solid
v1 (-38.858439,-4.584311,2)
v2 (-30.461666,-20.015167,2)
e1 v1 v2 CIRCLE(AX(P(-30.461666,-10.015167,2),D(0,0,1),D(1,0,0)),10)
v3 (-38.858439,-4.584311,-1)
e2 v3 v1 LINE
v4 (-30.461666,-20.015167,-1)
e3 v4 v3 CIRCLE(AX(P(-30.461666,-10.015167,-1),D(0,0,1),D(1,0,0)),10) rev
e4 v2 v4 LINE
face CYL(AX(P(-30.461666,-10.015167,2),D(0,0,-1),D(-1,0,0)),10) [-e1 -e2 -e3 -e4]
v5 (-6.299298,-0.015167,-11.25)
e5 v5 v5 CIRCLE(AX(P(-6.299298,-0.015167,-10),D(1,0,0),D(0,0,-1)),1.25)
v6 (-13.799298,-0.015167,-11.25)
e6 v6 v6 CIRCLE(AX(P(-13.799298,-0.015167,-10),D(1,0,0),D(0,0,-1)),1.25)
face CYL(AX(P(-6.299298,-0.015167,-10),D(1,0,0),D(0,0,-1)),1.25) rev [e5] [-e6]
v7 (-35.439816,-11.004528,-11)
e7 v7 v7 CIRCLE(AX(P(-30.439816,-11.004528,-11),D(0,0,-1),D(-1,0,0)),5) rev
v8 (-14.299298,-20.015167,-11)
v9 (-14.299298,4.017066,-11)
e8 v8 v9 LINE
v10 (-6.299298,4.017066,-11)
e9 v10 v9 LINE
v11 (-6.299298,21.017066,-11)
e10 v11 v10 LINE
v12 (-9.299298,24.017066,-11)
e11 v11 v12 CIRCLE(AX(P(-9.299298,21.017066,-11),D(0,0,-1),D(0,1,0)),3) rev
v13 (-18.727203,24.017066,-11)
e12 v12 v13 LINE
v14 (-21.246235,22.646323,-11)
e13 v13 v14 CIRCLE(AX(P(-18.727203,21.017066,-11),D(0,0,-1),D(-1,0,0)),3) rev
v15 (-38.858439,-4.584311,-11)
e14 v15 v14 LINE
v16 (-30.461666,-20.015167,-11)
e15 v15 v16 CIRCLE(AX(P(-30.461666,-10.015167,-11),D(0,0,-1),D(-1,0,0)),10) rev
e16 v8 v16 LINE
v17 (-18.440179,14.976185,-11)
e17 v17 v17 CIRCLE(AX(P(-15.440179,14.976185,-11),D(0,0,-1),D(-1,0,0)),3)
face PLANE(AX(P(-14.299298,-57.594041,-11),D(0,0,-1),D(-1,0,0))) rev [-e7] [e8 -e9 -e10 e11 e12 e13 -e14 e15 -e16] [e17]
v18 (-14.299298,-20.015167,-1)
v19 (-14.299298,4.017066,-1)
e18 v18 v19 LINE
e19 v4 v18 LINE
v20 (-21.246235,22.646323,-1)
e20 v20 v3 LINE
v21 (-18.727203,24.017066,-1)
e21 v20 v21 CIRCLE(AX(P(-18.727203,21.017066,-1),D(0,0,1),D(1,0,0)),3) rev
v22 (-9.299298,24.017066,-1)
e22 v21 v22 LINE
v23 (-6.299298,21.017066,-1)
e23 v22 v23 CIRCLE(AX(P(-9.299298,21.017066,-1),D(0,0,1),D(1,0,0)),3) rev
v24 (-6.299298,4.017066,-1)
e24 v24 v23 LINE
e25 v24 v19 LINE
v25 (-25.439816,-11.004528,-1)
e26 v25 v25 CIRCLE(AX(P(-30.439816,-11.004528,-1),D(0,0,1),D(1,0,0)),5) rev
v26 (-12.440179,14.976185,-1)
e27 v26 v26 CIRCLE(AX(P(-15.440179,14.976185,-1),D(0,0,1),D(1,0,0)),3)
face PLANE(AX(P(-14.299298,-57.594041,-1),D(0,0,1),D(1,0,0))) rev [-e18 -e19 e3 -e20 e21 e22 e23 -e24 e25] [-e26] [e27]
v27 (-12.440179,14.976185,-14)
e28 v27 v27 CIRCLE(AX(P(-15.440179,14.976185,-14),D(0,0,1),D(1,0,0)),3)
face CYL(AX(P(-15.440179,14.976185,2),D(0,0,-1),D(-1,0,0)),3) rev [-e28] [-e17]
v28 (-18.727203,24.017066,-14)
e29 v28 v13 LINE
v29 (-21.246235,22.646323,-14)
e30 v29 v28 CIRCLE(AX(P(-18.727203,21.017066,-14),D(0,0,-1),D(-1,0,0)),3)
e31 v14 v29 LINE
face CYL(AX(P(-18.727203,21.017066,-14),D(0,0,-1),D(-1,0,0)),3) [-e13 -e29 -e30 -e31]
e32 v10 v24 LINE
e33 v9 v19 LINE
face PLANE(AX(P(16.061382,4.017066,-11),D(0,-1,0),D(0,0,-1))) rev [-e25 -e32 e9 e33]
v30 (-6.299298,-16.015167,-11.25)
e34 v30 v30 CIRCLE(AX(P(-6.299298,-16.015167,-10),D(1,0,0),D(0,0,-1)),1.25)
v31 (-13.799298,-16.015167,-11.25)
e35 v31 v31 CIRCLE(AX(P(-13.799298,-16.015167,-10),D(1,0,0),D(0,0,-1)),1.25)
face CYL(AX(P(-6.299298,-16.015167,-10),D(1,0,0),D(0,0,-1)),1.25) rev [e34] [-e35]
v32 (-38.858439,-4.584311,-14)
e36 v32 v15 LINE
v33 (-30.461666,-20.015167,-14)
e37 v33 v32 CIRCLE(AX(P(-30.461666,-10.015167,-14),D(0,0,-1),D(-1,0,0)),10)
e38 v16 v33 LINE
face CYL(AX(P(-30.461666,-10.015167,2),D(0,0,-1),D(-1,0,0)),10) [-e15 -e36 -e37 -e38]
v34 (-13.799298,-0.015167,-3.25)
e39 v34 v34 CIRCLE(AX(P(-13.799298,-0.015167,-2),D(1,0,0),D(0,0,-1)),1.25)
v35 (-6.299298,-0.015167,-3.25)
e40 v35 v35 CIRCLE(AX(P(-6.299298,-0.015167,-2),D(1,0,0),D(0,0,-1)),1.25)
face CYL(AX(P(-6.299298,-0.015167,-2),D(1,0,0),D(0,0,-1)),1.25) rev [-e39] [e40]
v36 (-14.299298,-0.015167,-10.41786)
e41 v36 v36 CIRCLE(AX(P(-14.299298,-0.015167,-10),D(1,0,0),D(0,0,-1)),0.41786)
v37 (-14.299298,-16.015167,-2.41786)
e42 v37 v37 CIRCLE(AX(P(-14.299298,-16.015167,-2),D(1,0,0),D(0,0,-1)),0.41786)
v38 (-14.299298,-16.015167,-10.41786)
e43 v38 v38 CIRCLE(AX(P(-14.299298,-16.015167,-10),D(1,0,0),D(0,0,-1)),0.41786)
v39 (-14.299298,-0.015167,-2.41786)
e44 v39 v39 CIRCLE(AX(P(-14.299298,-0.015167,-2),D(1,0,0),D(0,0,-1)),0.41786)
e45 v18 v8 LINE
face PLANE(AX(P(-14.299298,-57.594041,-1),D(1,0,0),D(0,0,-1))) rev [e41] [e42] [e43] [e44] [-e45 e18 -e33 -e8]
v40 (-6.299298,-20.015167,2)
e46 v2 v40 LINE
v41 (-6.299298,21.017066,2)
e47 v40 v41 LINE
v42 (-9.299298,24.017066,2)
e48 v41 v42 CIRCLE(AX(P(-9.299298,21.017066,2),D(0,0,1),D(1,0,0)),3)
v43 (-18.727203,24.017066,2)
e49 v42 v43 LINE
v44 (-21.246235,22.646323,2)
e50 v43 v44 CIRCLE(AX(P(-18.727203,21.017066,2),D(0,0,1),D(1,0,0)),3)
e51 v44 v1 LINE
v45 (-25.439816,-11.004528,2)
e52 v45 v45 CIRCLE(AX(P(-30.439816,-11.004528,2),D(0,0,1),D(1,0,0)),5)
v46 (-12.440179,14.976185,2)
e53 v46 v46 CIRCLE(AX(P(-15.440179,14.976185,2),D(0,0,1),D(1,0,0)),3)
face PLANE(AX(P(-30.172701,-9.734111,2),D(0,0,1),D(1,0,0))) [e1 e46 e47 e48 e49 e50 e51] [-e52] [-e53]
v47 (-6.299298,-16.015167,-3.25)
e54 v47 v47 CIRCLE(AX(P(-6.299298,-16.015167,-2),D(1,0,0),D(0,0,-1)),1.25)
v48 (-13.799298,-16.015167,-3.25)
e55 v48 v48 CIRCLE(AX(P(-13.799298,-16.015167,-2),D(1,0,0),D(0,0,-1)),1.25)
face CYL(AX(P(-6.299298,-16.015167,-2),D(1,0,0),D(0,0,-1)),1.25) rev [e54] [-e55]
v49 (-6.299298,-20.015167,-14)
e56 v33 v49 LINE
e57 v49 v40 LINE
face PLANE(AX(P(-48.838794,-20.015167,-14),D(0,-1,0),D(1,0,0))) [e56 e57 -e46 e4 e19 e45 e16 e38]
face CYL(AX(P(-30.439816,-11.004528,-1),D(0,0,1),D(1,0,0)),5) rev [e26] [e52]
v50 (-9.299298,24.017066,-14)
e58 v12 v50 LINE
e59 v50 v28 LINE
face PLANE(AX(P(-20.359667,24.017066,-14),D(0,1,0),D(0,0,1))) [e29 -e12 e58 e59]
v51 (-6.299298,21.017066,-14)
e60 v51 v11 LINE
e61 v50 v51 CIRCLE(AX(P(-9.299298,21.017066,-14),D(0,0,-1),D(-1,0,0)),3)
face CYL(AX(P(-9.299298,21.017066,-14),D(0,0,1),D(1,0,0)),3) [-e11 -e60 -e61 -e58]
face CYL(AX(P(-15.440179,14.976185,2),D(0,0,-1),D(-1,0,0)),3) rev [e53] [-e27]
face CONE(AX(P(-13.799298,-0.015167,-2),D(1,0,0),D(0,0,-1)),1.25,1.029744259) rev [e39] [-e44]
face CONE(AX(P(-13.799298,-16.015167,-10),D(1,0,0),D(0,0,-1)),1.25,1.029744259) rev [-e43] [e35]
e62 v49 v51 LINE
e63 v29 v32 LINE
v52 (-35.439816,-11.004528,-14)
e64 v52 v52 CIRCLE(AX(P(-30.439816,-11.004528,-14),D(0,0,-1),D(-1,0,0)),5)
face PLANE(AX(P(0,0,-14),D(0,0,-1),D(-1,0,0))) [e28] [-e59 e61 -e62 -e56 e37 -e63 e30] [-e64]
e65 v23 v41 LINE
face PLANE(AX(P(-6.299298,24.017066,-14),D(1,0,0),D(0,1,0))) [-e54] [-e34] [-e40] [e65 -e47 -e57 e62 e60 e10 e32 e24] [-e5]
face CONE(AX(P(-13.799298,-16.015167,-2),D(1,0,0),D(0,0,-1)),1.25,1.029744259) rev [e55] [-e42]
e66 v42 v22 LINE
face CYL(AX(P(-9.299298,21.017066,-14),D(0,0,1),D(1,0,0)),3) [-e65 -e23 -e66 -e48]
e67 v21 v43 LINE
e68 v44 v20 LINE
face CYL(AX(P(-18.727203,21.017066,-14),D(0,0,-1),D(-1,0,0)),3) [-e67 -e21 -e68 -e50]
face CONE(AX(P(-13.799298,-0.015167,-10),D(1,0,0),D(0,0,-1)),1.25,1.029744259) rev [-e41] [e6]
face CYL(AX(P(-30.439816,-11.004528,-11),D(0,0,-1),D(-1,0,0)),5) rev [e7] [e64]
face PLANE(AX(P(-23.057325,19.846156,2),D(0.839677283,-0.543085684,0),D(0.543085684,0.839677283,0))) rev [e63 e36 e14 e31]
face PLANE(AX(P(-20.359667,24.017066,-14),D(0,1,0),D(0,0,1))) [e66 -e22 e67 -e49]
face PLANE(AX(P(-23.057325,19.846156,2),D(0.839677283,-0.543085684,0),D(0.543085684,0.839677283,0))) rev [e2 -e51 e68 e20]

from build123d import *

# Parameters (mm, degrees)
SKETCH_1_R             = 3
EXTRUDE_1_DEPTH        = 2
SKETCH_2_W             = 53.96
SKETCH_2_H             = 15
SKETCH_2_R             = 1.6
SKETCH_2_R_2           = 1
EXTRUDE_2_DEPTH        = 2
PATTERN_LINEAR_1_COUNT = 2
PATTERN_LINEAR_1_PITCH = 13
FILLET_1_R             = 1
EXTRUDE_START          = -16
SKETCH_4_R             = 3
EXTRUDE_3_DEPTH        = 16
SKETCH_5_W             = 71.597299473
SKETCH_5_H             = 10
CUT_EXTRUDE_1_DEPTH    = 15
SKETCH_6_R             = 5
CUT_EXTRUDE_2_DEPTH    = 3
CUT_EXTRUDE_START      = -3
SKETCH_7_R             = 5
CUT_EXTRUDE_3_DEPTH    = 3
FILLET_2_R             = 10
SKETCH_8_W             = 2
SKETCH_8_H             = 0.095117033
EXTRUDE_5_DEPTH        = 0.002
CUT_EXTRUDE_4_DEPTH    = 16
FILLET_3_R             = 3
CUT_EXTRUDE_5_REACH    = 63.416
SKETCH_11_W            = 36.223911337
SKETCH_11_H            = 10
SKETCH_14_W            = 10
SKETCH_14_H            = 20
CUT_EXTRUDE_6_DEPTH    = 8
HOLE_WIZARD_M3_1_D     = 2.5
HOLE_WIZARD_M3_1_DEPTH = 7.5
HOLE_WIZARD_M3_1_TIP   = 0.751075774


with BuildPart() as part:
    # 草图1 → 凸台-拉伸1 (new body)
    with BuildSketch(Plane.XY):
        with BuildLine():
            Line((-31.667580782, -19.712759913), (-15.214545893, -22.177554229))
            Line((-15.214545893, -22.177554229), (-14.362700527, -22.30516738))
            Line((-14.362700527, -22.30516738), (-14.362700527, -23.166518437))
            Line((-14.362700527, -23.166518437), (-14.362700527, -25.01516738))
            Line((-14.362700527, -25.01516738), (39.597299473, -25.01516738))
            Line((39.597299473, -25.01516738), (39.597299473, -20.01516738))
            Line((39.597299473, -20.01516738), (-6.399297664, -20.01516738))
            Line((-6.399297664, -20.01516738), (-6.399297664, 14.684969608))
            ThreePointArc((-6.399297664, 14.684969608), (-6.397869517, 15.219044335), (-6.427963434, 15.752272438))
            ThreePointArc((-6.427963434, 15.752272438), (-6.435285609, 15.800138476), (-6.441446817, 15.848167752))
            ThreePointArc((-6.441446817, 15.848167752), (-13.325191112, 23.766199394), (-23.057324529, 19.846156059))
            Line((-23.057324529, 19.846156059), (-38.645044316, -4.254376507))
            ThreePointArc((-38.645044316, -4.254376507), (-39.369264732, -13.885171984), (-31.667580782, -19.712759913))
        make_face()
        with Locations((-30.439815615, -11.004528038)):
            Circle(SKETCH_1_R, mode=Mode.SUBTRACT)
        with Locations((-15.440178747, 14.976184715)):
            Circle(SKETCH_1_R, mode=Mode.SUBTRACT)
    extrude_1 = extrude(amount=EXTRUDE_1_DEPTH)

    # 草图2 → 凸台-拉伸2 (add)
    with BuildSketch(Plane.XZ.offset(25.01516738)):
        with Locations((12.617299473, -5.5)):
            Rectangle(SKETCH_2_W, SKETCH_2_H)
        with Locations(Location((26.637299473, -5.5, 0), (0, 0, 270))):
            Circle(SKETCH_2_R, mode=Mode.SUBTRACT)
        with Locations(Location((-9.362700527, -5.5, 0), (0, 0, 270))):
            Circle(SKETCH_2_R, mode=Mode.SUBTRACT)
        with Locations(Location((-3.141180602, -5.5, 0), (0, 0, 270))):
            Circle(SKETCH_2_R_2, mode=Mode.SUBTRACT)
        with Locations(Location((20.358819398, -5.5, 0), (0, 0, 270))):
            Circle(SKETCH_2_R_2, mode=Mode.SUBTRACT)
        with BuildLine():
            Line((3.367759388, -1.25), (-1.491180602, -1.25))
            Line((-1.491180602, -1.25), (-1.491180602, -9.75))
            Line((-1.491180602, -9.75), (3.367759388, -9.75))
            ThreePointArc((3.367759388, -9.75), (6.858819398, -11), (10.349879409, -9.75))
            Line((10.349879409, -9.75), (18.708819398, -9.75))
            Line((18.708819398, -9.75), (18.708819398, -1.25))
            Line((18.708819398, -1.25), (10.349879409, -1.25))
            ThreePointArc((10.349879409, -1.25), (6.858819398, 0), (3.367759388, -1.25))
        make_face(mode=Mode.SUBTRACT)
    extrude(amount=-EXTRUDE_2_DEPTH)

    # 阵列(线性)1: 凸台-拉伸1 ×2
    with Locations(*[(0, 0, -i * PATTERN_LINEAR_1_PITCH) for i in range(1, PATTERN_LINEAR_1_COUNT)]):
        add(extrude_1)

    # 圆角1
    fillet_1_edges = [part.edges().sort_by_distance(p)[0] for p in [
        (-14.362700527, -22.30516738, -12),
    ]]
    fillet(fillet_1_edges, radius=FILLET_1_R - 0.0004)  # a hair under: the kernel refuses the full size

    # 草图4 → 凸台-拉伸3 (add)
    with BuildSketch(Plane.XY.offset(2).offset(EXTRUDE_START)):
        Polygon((-20.359667451, 24.017065798), (-48.838793814, -20.01516738), (-6.299297664, -20.01516738), (-6.299297664, 24.017065798), align=None)
        with Locations((-15.440178747, 14.976184715)):
            Circle(SKETCH_4_R, mode=Mode.SUBTRACT)
        with Locations((-30.439815615, -11.004528038)):
            Circle(SKETCH_4_R, mode=Mode.SUBTRACT)
    extrude(amount=EXTRUDE_3_DEPTH)

    # 草图5 → 切除-拉伸1 (cut)
    with BuildSketch(Plane.XY.offset(2)):
        with Locations((3.798649736, -25.01516738)):
            Rectangle(SKETCH_5_W, SKETCH_5_H)
    extrude(amount=-CUT_EXTRUDE_1_DEPTH, mode=Mode.SUBTRACT)

    # 草图6 → 切除-拉伸2 (cut)
    with BuildSketch(Plane.XY.offset(2)):
        with Locations((-30.439815615, -11.004528038)):
            Circle(SKETCH_6_R)
    extrude(amount=-CUT_EXTRUDE_2_DEPTH, mode=Mode.SUBTRACT)

    # 草图7 → 切除-拉伸3 (cut)
    with BuildSketch(Plane(origin=(0, 0, -14), x_dir=(-1, 0, 0), z_dir=(0, 0, -1)).offset(CUT_EXTRUDE_START)):
        with Locations(Location((30.439815615, -11.004528038, 0), (0, 0, 180))):
            Circle(SKETCH_7_R)
    extrude(amount=CUT_EXTRUDE_3_DEPTH, mode=Mode.SUBTRACT)

    # 圆角2
    fillet_2_edges = [part.edges().sort_by_distance(p)[0] for p in [
        (-48.838793814, -20.01516738, -6),
    ]]
    fillet(fillet_2_edges, radius=FILLET_2_R)

    # 草图8 → 凸台-拉伸5 (add)
    with BuildSketch(Plane(origin=(-25.306928561, 16.367991454, 0), x_dir=(0, 0, 1), z_dir=(-0.8396772833764469, 0.5430856836462826, 0))):
        with Locations((-12, 4.189822066)):
            Rectangle(SKETCH_8_W, SKETCH_8_H)
        with Locations((1, 4.189822066)):
            Rectangle(SKETCH_8_W, SKETCH_8_H)
    extrude(amount=EXTRUDE_5_DEPTH)

    # 草图9 → 切除-拉伸4 (cut)
    with BuildSketch(Plane.XY.offset(2)):
        Polygon((-23.00566783, 19.926023671), (-23.057324529, 19.846156059), (-23.897001813, 20.389241743), (-23.845345113, 20.469109355), align=None)
    extrude(amount=-CUT_EXTRUDE_4_DEPTH, mode=Mode.SUBTRACT)

    # 圆角3
    fillet_3_edges = [part.edges().sort_by_distance(p)[0] for p in [
        (-20.359667451, 24.017065798, -6),
        (-6.299297664, 24.017065798, -6),
    ]]
    fillet(fillet_3_edges, radius=FILLET_3_R)

    # 切除-拉伸5: up to this face of the body (flat: up to its plane)
    cut_extrude_5_end = Plane(part.part.faces().sort_by_distance((-18.380481786, -20.01516738, -6))[0])
    # 草图11 → 切除-拉伸5 (cut, up to the picked face)
    with BuildSketch(Plane(origin=(0, 24.017065798, 0), x_dir=(1, 0, 0), z_dir=(0, 1, 0)), mode=Mode.PRIVATE) as cut_extrude_5_sk1:
        with Locations((-32.411253333, 6)):
            Rectangle(SKETCH_11_W, SKETCH_11_H)
    cut_extrude_5_tool1 = split(extrude(cut_extrude_5_sk1.sketch, amount=-CUT_EXTRUDE_5_REACH, mode=Mode.PRIVATE), bisect_by=cut_extrude_5_end, keep=Keep.BOTH, mode=Mode.PRIVATE)
    add(cut_extrude_5_tool1.solids().sort_by(Axis((-32.411253, 24.017066, -6), (0, -1, 0)))[0], mode=Mode.SUBTRACT)

    # 草图14 → 切除-拉伸6 (cut)
    with BuildSketch(Plane.ZY.offset(14.299297664)):
        with Locations((-6, 14.017065798)):
            Rectangle(SKETCH_14_W, SKETCH_14_H)
    extrude(amount=-CUT_EXTRUDE_6_DEPTH, mode=Mode.SUBTRACT)

    # M3 螺纹孔1
    with Locations(Plane(origin=(-6.299297664, 0, 0), x_dir=(0, 0, -1), z_dir=(1, 0, 0))):
        with Locations((2, -0.01516738), (10, -0.01516738), (2, -16.01516738), (10, -16.01516738)):
            Hole(HOLE_WIZARD_M3_1_D / 2, depth=HOLE_WIZARD_M3_1_DEPTH)
            with Locations((0, 0, -(HOLE_WIZARD_M3_1_DEPTH + HOLE_WIZARD_M3_1_TIP / 2))):  # 118° drill point
                Cone(0, HOLE_WIZARD_M3_1_D / 2, HOLE_WIZARD_M3_1_TIP, mode=Mode.SUBTRACT)


solid = part.part
